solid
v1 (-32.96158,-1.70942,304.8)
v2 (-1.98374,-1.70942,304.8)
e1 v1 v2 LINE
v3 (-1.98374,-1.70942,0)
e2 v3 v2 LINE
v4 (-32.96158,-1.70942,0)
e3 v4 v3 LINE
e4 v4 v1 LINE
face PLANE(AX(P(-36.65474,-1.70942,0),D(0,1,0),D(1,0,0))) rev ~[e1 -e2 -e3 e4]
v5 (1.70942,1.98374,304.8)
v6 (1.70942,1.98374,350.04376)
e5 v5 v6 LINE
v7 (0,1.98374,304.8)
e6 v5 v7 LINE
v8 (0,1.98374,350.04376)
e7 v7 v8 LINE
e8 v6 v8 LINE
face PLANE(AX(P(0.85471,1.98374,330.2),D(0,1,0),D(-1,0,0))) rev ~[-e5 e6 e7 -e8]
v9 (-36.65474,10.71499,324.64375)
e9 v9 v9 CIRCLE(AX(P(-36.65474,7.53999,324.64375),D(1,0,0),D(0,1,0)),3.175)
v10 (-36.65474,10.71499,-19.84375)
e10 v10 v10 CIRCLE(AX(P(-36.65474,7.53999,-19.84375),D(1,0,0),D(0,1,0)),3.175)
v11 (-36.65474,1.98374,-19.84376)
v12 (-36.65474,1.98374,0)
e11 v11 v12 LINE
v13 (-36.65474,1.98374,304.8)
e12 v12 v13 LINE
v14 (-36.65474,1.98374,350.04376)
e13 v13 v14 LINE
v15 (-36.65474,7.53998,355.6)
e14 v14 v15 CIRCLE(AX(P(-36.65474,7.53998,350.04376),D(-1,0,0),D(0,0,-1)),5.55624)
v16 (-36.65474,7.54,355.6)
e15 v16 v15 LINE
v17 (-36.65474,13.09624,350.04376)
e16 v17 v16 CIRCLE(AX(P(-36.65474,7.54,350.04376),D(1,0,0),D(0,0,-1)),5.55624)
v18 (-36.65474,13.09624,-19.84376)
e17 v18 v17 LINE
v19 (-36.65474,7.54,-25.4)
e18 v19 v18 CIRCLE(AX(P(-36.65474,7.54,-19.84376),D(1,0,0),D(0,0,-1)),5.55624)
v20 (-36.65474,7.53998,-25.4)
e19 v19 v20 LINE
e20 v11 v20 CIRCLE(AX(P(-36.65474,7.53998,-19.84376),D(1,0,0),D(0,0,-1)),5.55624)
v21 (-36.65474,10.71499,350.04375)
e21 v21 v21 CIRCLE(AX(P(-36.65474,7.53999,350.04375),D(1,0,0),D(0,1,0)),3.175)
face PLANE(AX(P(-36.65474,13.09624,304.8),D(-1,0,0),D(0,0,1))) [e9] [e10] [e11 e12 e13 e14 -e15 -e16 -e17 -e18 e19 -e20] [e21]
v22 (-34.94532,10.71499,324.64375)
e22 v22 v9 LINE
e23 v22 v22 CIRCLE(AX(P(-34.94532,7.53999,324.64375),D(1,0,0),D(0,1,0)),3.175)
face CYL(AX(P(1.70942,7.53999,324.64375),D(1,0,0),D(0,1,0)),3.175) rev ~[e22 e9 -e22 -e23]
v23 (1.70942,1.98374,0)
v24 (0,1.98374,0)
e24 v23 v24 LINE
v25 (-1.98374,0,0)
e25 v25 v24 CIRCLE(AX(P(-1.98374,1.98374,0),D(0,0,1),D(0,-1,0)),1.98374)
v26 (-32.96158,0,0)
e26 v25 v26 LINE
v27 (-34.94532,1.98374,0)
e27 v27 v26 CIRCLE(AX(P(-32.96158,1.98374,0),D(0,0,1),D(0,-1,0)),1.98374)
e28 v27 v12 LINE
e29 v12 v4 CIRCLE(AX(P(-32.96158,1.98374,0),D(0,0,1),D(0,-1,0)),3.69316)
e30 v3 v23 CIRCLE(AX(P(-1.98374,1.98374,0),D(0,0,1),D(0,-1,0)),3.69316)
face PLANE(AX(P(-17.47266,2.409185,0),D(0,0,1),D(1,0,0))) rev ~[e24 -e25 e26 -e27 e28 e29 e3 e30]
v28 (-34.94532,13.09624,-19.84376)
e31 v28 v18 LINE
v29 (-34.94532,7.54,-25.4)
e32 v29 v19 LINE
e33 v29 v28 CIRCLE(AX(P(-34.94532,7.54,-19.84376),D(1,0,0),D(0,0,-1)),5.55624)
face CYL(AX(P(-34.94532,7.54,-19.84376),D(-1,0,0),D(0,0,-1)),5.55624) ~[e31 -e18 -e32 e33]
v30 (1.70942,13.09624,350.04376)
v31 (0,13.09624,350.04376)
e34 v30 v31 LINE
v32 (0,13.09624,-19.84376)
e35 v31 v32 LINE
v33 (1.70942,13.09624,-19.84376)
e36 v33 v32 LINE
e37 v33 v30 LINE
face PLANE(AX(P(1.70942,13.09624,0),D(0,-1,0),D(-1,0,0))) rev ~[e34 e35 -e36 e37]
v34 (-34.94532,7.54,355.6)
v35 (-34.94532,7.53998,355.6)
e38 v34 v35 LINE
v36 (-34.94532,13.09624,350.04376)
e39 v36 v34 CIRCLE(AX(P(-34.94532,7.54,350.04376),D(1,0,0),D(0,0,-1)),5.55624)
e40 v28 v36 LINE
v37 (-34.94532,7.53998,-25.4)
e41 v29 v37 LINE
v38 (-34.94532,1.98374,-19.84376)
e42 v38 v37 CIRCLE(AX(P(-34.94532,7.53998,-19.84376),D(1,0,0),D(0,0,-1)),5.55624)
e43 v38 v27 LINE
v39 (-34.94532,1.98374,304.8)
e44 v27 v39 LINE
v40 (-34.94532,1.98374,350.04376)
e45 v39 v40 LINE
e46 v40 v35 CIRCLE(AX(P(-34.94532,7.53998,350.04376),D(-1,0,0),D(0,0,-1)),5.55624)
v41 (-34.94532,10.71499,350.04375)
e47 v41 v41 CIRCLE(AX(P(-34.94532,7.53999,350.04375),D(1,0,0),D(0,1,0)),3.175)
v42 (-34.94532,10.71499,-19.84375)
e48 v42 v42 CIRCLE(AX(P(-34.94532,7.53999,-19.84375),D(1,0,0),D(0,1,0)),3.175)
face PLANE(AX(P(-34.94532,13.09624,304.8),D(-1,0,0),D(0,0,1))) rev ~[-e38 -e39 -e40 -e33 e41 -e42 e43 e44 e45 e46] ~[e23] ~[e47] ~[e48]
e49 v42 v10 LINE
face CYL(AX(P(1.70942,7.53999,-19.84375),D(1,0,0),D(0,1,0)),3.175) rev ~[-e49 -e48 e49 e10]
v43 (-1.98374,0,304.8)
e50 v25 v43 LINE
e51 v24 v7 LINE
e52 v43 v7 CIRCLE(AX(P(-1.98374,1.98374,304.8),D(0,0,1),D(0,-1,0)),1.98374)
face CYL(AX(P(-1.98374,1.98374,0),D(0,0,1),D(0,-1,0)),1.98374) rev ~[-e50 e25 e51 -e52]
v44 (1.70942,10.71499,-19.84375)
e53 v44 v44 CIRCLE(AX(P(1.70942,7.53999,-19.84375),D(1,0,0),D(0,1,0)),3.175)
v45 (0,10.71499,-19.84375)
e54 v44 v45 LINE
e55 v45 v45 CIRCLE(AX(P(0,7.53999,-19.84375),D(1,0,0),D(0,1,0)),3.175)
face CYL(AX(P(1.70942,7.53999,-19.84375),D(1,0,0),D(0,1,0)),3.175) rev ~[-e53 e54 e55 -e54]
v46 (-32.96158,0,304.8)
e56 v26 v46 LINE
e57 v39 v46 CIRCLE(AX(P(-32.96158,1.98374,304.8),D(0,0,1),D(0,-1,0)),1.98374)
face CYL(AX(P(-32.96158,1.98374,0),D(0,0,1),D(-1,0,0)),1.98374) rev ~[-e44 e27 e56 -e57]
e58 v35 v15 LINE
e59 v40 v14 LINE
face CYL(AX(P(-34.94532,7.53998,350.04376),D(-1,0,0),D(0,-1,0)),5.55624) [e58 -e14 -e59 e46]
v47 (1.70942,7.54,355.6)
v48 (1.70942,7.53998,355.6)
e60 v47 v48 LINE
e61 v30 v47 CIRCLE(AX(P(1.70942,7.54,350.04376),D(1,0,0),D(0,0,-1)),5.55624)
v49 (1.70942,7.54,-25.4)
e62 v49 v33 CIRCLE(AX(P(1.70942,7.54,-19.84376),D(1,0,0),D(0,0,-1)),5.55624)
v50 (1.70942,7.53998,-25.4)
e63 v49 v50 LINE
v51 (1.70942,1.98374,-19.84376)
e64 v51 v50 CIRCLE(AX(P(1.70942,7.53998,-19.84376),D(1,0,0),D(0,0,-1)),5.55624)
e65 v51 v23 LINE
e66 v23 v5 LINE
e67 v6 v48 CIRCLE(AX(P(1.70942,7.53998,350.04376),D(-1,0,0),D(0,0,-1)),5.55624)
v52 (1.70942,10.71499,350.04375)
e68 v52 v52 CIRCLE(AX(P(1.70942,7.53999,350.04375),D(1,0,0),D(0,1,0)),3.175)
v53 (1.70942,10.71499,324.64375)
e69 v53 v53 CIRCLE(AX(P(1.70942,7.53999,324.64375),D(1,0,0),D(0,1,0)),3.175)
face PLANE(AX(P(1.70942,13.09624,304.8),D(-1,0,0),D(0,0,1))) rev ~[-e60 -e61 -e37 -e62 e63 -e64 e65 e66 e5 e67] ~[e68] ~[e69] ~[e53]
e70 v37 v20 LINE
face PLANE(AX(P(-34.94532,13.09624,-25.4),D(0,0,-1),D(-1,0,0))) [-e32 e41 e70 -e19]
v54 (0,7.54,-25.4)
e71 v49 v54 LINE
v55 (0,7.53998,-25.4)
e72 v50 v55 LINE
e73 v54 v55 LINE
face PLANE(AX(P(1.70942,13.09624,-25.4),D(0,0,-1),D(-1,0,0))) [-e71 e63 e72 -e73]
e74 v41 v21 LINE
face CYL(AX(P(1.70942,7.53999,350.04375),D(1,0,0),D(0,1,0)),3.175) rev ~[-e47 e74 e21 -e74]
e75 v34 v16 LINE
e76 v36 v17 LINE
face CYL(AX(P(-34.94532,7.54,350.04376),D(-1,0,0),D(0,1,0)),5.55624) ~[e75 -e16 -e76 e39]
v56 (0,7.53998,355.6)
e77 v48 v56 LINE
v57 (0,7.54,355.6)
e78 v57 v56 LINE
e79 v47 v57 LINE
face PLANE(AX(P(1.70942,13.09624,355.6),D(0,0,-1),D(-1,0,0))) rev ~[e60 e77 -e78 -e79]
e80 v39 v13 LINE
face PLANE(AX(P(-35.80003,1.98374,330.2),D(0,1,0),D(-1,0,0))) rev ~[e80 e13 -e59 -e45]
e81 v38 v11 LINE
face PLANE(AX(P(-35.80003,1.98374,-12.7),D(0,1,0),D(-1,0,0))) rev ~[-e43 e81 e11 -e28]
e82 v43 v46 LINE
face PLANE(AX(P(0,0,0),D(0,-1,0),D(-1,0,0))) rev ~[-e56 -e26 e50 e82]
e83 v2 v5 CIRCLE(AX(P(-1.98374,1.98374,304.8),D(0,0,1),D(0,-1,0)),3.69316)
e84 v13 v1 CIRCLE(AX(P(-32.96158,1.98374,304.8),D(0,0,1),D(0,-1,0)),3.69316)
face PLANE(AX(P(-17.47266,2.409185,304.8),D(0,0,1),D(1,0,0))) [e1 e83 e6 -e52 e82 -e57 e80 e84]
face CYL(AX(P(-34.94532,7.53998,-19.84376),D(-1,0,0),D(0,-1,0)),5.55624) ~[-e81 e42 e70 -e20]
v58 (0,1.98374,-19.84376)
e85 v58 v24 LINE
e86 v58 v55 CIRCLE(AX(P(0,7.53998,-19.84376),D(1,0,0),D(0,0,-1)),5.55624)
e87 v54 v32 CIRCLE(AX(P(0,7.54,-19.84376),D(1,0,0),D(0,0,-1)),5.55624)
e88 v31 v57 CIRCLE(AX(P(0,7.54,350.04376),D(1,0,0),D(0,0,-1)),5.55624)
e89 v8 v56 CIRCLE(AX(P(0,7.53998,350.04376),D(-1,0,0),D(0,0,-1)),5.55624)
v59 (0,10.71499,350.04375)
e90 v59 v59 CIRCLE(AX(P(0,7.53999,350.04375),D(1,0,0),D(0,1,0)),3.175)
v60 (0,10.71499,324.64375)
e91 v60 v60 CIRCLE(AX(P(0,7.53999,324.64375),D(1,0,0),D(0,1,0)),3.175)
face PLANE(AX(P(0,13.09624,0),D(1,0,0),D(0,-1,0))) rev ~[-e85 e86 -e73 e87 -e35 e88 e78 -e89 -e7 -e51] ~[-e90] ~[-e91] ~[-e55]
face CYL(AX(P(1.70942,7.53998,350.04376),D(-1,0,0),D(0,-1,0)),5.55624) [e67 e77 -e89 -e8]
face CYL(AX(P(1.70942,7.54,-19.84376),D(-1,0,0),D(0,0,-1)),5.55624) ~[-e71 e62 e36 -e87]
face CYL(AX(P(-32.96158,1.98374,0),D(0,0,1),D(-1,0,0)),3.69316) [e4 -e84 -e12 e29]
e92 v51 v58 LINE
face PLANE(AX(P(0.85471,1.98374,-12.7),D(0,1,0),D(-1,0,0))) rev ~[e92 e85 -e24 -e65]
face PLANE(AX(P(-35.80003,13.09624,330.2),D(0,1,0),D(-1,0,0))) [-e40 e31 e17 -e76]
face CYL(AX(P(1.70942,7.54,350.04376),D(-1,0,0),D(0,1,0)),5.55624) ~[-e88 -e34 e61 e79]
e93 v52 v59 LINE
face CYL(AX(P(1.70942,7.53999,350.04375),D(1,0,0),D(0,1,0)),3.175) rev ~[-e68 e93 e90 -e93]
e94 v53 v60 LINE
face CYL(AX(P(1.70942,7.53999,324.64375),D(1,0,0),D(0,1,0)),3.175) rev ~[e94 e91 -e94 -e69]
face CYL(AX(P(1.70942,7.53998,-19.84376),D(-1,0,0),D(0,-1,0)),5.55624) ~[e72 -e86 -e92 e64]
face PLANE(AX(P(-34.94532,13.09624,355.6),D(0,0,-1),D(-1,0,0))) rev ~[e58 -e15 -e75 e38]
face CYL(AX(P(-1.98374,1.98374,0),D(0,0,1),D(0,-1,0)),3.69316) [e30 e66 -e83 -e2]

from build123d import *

# Parameters (mm, degrees)
F1_DEPTH = 304.8
F2_R     = 3.69316
F3_R     = 1.98374
F4_W     = 1.70942
F4_H     = 50.8
F4_H_2   = 25.4
F6_DEPTH = 11.1125
F7_R     = 5.55624
F8_R     = 3.175
F9_DEPTH = 38.36416


# Not quite as in the source:
# - a fillet or chamfer is up to 0.001 mm smaller than in the source, because OpenCascade refuses the exact size


with BuildPart() as f1:
    # F0 (on Top) → F1 (new body)
    with BuildSketch(Plane.XY):
        Polygon((0, 13.09624), (0, 0), (-34.94532, 0), (-34.94532, 13.09624), (-36.65474, 13.09624), (-36.65474, -1.70942), (1.70942, -1.70942), (1.70942, 13.09624), align=None)
    extrude(amount=F1_DEPTH)

    # F2
    f2_edges = [f1.edges().sort_by_distance(p)[0] for p in [
        (1.70942, -1.70942, 152.4),
        (-36.65474, -1.70942, 152.4),
    ]]
    fillet(f2_edges, radius=F2_R)

    # F3
    f3_edges = [f1.edges().sort_by_distance(p)[0] for p in [
        (0, 0, 152.4),
        (-34.94532, 0, 152.4),
    ]]
    fillet(f3_edges, radius=F3_R)

    # F4 (on face) → F6 (join, through all)
    with BuildSketch(Plane(origin=(0, 13.09624, 0), x_dir=(-1, 0, 0), z_dir=(0, 1, 0))):
        with Locations((35.80003, 330.2)):
            Rectangle(F4_W, F4_H)
        with Locations((-0.85471, 330.2)):
            Rectangle(F4_W, F4_H)
        with Locations((-0.85471, -12.7)):
            Rectangle(F4_W, F4_H_2)
        with Locations((35.80003, -12.7)):
            Rectangle(F4_W, F4_H_2)
    extrude(amount=-F6_DEPTH)

    # F7 (radius 5.55625 in the source; OpenCascade refuses exactly that, so slightly less here)
    f7_edges = [f1.edges().sort_by_distance(p)[0] for p in [
        (-35.80003, 13.09624, -25.4),
        (0.85471, 13.09624, -25.4),
        (0.85471, 13.09624, 355.6),
        (-35.80003, 13.09624, 355.6),
        (-35.80003, 1.98374, -25.4),
        (-35.80003, 1.98374, 355.6),
        (0.85471, 1.98374, 355.6),
        (0.85471, 1.98374, -25.4),
    ]]
    fillet(f7_edges, radius=F7_R)

    # F8 (on face) → F9 (cut, through all)
    with BuildSketch(Plane.YZ.offset(1.70942)):
        with Locations((7.53999, -19.84375)):
            Circle(F8_R)
        with Locations((7.53999, 350.04375)):
            Circle(F8_R)
        with Locations((7.53999, 324.64375)):
            Circle(F8_R)
    extrude(amount=-F9_DEPTH, mode=Mode.SUBTRACT)


solid = f1.part
